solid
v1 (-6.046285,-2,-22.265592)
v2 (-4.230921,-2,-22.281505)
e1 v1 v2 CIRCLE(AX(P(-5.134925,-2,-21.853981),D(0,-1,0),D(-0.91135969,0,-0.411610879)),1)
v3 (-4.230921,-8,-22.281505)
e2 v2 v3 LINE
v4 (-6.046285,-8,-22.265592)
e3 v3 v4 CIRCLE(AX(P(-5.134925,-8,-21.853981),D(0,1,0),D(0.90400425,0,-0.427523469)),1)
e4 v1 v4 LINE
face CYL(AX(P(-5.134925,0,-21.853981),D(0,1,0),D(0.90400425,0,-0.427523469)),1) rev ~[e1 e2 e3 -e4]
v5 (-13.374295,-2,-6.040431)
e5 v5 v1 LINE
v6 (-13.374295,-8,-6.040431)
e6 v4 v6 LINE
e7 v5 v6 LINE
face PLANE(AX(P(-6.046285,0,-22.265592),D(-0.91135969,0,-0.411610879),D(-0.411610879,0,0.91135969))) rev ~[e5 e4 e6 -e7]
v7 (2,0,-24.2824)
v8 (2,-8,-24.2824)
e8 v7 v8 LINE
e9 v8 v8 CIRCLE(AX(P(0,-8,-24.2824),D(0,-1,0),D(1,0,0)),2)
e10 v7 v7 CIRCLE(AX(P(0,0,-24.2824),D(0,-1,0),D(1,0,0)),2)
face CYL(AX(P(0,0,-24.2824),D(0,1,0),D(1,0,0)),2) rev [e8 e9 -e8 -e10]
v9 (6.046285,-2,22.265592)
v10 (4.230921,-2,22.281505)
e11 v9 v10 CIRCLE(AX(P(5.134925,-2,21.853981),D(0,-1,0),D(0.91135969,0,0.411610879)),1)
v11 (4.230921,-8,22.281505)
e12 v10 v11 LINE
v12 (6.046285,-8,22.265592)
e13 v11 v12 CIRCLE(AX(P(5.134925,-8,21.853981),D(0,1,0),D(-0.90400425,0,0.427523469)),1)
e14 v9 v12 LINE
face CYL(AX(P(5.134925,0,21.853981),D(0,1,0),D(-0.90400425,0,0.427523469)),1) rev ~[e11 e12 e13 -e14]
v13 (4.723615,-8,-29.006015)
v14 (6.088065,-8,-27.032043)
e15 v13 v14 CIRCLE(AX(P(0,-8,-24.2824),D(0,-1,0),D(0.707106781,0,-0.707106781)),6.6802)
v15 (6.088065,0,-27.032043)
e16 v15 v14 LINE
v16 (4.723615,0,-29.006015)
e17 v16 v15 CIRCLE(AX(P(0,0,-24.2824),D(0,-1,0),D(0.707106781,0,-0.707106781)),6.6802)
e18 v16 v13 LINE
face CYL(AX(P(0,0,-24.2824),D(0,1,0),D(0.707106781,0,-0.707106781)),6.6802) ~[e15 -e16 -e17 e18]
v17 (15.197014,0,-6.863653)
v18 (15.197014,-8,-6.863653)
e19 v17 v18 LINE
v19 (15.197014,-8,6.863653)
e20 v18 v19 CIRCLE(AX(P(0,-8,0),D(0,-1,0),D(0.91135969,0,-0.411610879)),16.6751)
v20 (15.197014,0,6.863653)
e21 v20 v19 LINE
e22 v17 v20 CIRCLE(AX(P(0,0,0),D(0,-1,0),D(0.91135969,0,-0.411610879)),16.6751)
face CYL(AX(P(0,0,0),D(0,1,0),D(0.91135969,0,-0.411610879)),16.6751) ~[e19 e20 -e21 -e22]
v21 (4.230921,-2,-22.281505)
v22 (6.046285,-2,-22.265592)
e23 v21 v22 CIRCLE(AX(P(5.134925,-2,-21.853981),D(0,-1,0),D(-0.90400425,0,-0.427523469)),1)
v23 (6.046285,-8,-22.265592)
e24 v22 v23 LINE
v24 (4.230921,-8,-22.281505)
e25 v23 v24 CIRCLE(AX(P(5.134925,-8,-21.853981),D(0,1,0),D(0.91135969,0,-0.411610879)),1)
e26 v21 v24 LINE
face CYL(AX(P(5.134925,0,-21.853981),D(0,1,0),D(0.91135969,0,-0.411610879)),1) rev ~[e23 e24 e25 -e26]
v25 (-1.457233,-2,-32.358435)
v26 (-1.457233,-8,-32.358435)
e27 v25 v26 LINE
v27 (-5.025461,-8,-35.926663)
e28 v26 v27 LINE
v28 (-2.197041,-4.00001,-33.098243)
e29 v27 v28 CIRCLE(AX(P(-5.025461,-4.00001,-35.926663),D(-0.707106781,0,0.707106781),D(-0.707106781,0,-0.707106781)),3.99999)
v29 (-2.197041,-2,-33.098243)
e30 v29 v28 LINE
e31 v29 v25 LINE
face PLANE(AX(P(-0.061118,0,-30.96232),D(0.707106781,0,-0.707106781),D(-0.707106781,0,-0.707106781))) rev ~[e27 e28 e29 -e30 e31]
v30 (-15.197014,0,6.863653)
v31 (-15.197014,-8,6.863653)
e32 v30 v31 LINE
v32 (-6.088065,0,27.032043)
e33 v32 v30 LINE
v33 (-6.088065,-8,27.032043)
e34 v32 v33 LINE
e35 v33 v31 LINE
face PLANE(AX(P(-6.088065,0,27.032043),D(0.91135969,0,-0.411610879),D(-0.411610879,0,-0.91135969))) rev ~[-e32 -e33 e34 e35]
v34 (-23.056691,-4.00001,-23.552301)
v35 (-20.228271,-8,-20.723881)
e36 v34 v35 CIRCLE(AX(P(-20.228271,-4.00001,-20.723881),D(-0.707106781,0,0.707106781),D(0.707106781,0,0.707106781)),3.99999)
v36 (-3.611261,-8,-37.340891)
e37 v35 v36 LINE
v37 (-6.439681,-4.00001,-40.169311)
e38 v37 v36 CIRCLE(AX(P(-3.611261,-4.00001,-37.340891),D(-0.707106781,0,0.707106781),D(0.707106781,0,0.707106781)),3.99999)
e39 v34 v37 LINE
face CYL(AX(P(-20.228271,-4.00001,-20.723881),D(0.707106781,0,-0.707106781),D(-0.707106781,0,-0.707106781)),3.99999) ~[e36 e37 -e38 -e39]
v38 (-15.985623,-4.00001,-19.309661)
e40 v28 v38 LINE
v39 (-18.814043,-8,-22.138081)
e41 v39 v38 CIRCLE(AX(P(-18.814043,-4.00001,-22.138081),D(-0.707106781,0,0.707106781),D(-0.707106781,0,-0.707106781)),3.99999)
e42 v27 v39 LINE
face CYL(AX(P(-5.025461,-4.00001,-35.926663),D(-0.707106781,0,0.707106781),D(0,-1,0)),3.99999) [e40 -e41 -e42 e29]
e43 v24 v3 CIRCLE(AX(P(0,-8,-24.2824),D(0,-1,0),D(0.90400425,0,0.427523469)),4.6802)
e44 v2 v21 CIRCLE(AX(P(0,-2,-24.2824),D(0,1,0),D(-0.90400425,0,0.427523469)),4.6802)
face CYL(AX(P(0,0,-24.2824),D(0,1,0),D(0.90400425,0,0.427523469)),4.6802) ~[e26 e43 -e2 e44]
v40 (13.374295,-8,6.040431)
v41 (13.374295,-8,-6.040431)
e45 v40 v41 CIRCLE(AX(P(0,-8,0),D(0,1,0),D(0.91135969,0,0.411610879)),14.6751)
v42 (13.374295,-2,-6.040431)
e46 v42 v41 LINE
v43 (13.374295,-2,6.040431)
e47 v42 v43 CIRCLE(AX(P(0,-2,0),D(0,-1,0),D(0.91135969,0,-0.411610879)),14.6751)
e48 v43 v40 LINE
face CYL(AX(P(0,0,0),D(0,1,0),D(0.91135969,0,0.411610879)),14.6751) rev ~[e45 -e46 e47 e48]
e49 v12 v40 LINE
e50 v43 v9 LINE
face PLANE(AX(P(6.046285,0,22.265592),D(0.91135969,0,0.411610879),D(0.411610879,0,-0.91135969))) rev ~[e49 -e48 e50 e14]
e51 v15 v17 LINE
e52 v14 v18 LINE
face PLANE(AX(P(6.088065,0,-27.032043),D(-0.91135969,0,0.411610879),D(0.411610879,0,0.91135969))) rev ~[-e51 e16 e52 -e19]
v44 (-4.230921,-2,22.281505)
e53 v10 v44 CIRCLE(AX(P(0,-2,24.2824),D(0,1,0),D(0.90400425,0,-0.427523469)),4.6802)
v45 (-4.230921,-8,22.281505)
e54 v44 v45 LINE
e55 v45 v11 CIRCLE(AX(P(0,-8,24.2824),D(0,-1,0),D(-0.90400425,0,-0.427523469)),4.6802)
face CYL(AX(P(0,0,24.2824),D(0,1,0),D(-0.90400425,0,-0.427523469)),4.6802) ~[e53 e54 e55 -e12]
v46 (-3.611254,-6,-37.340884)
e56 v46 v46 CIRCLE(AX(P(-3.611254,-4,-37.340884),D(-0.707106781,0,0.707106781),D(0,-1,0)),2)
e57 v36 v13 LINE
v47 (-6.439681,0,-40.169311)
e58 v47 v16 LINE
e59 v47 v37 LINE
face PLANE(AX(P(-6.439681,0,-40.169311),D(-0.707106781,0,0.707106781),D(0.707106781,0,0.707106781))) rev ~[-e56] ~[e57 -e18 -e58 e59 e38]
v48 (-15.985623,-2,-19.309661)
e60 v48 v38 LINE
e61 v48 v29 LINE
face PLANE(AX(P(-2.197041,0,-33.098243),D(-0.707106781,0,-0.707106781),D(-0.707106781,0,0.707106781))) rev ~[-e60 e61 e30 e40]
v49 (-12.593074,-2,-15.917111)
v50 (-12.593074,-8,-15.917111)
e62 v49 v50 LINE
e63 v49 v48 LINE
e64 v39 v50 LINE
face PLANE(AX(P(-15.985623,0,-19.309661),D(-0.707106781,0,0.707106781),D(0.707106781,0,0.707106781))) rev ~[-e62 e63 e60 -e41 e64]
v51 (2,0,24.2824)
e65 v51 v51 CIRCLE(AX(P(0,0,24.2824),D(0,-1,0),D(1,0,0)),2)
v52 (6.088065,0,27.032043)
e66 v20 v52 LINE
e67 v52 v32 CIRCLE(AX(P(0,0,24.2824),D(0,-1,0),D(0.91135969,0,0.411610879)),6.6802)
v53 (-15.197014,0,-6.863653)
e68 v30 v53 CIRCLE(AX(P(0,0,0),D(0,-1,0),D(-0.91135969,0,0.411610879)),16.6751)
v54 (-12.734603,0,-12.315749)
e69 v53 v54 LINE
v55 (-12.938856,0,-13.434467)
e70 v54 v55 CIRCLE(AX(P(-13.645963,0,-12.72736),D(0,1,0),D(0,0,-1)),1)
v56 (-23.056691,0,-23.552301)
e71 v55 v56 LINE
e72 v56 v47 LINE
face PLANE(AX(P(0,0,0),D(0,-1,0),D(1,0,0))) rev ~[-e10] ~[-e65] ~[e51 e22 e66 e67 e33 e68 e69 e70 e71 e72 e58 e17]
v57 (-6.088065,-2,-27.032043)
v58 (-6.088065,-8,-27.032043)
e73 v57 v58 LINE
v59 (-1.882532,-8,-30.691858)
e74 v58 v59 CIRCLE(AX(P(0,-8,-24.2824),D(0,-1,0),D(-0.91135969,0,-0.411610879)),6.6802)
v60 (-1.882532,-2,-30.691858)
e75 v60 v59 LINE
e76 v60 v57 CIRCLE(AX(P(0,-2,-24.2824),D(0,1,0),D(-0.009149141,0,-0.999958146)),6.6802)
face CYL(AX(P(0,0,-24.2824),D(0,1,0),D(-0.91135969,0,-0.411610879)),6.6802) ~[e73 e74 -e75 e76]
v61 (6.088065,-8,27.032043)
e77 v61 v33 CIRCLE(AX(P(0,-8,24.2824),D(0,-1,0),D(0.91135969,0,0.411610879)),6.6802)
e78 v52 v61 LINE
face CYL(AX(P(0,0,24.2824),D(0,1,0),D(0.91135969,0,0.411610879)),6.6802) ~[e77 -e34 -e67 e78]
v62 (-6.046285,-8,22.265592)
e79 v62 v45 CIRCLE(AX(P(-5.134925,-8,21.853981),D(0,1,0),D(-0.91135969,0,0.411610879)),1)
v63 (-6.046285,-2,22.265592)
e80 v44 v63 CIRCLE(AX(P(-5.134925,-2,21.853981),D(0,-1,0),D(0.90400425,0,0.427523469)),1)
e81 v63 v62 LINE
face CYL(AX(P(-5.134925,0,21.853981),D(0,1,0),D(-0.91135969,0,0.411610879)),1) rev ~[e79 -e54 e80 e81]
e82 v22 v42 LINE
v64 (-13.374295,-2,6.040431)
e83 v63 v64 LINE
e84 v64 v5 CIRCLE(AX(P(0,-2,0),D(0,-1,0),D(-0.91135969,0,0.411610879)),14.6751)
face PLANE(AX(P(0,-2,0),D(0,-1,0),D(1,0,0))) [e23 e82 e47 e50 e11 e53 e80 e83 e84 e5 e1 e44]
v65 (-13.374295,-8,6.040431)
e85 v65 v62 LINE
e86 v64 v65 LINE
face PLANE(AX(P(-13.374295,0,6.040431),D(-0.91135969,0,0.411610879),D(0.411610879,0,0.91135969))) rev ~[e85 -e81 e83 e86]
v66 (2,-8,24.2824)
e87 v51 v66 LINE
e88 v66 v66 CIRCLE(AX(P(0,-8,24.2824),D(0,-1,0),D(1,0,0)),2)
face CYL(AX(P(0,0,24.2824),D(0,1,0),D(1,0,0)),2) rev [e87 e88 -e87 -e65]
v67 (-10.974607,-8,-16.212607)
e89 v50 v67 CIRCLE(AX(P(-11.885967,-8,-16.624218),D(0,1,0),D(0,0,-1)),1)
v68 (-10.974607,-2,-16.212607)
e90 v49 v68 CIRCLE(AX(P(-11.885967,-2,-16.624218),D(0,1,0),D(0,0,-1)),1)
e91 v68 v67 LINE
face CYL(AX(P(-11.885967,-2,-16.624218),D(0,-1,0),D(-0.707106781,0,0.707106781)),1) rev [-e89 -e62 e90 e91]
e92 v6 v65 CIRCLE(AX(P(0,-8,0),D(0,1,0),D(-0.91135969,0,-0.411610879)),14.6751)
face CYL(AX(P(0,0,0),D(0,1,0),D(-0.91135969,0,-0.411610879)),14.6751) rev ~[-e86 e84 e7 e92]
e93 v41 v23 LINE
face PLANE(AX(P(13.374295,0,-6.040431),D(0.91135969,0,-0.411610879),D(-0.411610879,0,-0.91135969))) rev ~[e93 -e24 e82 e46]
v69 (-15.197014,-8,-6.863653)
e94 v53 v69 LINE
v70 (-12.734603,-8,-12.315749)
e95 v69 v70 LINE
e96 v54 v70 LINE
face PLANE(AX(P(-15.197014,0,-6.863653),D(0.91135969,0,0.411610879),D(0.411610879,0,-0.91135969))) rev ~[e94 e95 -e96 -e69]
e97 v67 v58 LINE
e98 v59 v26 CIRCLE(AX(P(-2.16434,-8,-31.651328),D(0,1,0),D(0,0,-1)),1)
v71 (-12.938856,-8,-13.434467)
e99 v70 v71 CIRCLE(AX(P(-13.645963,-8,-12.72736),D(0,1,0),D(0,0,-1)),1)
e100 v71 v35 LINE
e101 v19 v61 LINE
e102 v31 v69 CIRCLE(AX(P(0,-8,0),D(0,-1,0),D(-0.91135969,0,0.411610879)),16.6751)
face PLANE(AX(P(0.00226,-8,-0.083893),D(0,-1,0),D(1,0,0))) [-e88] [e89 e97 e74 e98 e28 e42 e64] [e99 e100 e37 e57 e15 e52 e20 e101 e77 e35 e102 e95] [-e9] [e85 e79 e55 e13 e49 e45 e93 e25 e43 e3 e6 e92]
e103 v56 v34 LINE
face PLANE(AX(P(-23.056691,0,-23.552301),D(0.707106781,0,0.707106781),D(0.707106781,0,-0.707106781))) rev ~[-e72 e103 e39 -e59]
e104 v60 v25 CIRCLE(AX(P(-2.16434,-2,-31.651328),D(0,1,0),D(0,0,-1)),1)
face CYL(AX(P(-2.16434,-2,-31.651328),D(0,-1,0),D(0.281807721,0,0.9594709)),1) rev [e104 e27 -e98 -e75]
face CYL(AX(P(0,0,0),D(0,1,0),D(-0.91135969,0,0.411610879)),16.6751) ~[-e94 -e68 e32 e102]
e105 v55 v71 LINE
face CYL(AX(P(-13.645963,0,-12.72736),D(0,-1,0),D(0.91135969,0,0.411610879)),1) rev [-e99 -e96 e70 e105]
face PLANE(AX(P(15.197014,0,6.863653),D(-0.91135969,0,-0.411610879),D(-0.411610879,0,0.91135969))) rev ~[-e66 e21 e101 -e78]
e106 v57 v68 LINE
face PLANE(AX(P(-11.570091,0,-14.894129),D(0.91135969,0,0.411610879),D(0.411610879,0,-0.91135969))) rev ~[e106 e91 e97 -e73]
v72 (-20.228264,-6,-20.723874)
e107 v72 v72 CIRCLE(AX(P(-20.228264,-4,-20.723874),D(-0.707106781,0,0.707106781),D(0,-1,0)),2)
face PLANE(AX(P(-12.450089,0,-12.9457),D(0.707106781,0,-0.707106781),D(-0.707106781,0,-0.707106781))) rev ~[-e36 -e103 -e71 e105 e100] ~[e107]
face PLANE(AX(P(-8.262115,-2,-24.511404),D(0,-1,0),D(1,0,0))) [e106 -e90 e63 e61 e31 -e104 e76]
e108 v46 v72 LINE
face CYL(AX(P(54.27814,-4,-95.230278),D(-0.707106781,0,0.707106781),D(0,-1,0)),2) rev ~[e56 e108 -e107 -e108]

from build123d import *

# Parameters (mm, degrees)
F0_R     = 2
F1_DEPTH = 8
F2_DEPTH = 2
F3_R     = 1
F5_D     = 4
F6_R     = 3.99999


# Not quite as in the source:
# - a fillet or chamfer is up to 0.001 mm smaller than in the source, because OpenCascade refuses the exact size


with BuildPart() as f1:
    # F0 (on Front) → F1 (new body)
    with BuildSketch(Plane.XZ):
        with BuildLine():
            Line((15.1970139668, 6.8636525628), (6.0880650012, 27.0320429916))
            ThreePointArc((6.0880650012, 27.0320429916), (0, 30.9626), (-6.0880650012, 27.0320429916))
            Line((-6.0880650012, 27.0320429916), (-15.1970139668, 6.8636525628))
            ThreePointArc((-15.1970139668, 6.8636525628), (-16.6751, 0), (-15.1970139668, -6.8636525628))
            Line((-15.1970139668, -6.8636525628), (-12.4500889322, -12.9456996558))
            Line((-12.4500889322, -12.9456996558), (-11.570090993, -14.8941288413))
            Line((-11.570090993, -14.8941288413), (-6.0880650012, -27.0320429916))
            ThreePointArc((-6.0880650012, -27.0320429916), (-3.6489564687, -29.8779507977), (-0.0611180905, -30.9623204051))
            ThreePointArc((-0.0611180905, -30.9623204051), (2.5281419438, -30.4657300374), (4.7236147197, -29.0060147197))
            ThreePointArc((4.7236147197, -29.0060147197), (5.4952020611, -28.0807978659), (6.0880650012, -27.0320429916))
            Line((6.0880650012, -27.0320429916), (15.1970139668, -6.8636525628))
            ThreePointArc((15.1970139668, -6.8636525628), (16.6751, 0), (15.1970139668, 6.8636525628))
        make_face()
        with Locations((0, -24.2824)):
            Circle(F0_R, mode=Mode.SUBTRACT)
        with BuildLine():
            Line((-13.3742945868, 6.0404308054), (-6.0462846285, 22.2655920687))
            ThreePointArc((-6.0462846285, 22.2655920687), (-5.1436901116, 22.8539427752), (-4.2309206889, 22.2815046593))
            ThreePointArc((-4.2309206889, 22.2815046593), (0, 19.6022), (4.2309206889, 22.2815046593))
            ThreePointArc((4.2309206889, 22.2815046593), (5.1436901116, 22.8539427752), (6.0462846285, 22.2655920687))
            Line((6.0462846285, 22.2655920687), (13.3742945868, 6.0404308054))
            ThreePointArc((13.3742945868, 6.0404308054), (14.6751, 0), (13.3742945868, -6.0404308054))
            Line((13.3742945868, -6.0404308054), (6.0462846285, -22.2655920687))
            ThreePointArc((6.0462846285, -22.2655920687), (5.1436901116, -22.8539427752), (4.2309206889, -22.2815046593))
            ThreePointArc((4.2309206889, -22.2815046593), (0, -19.6022), (-4.2309206889, -22.2815046593))
            ThreePointArc((-4.2309206889, -22.2815046593), (-5.1436901116, -22.8539427752), (-6.0462846285, -22.2655920687))
            Line((-6.0462846285, -22.2655920687), (-13.3742945868, -6.0404308054))
            ThreePointArc((-13.3742945868, -6.0404308054), (-14.6751, 0), (-13.3742945868, 6.0404308054))
        make_face(mode=Mode.SUBTRACT)
        with Locations((0, 24.2824)):
            Circle(F0_R, mode=Mode.SUBTRACT)
        with BuildLine():
            Line((-11.570090993, -14.8941288413), (-12.4500889322, -12.9456996558))
            Line((-12.4500889322, -12.9456996558), (-23.05669065, -23.5523013736))
            Line((-23.05669065, -23.5523013736), (-6.4396812921, -40.1693107315))
            Line((-6.4396812921, -40.1693107315), (4.7236147197, -29.0060147197))
            ThreePointArc((4.7236147197, -29.0060147197), (2.5281419438, -30.4657300374), (-0.0611180905, -30.9623204051))
            Line((-0.0611180905, -30.9623204051), (-2.197040605, -33.0982429196))
            Line((-2.197040605, -33.0982429196), (-15.9856228381, -19.3096606865))
            Line((-15.9856228381, -19.3096606865), (-11.570090993, -14.8941288413))
        make_face()
    extrude(amount=F1_DEPTH)

    # F0 (on Front) → F2 (join)
    with BuildSketch(Plane.XZ):
        with BuildLine():
            ThreePointArc((-4.2309206889, 22.2815046593), (-5.1436901116, 22.8539427752), (-6.0462846285, 22.2655920687))
            Line((-6.0462846285, 22.2655920687), (-13.3742945868, 6.0404308054))
            ThreePointArc((-13.3742945868, 6.0404308054), (-14.6751, 0), (-13.3742945868, -6.0404308054))
            Line((-13.3742945868, -6.0404308054), (-6.0462846285, -22.2655920687))
            ThreePointArc((-6.0462846285, -22.2655920687), (-5.1436901116, -22.8539427752), (-4.2309206889, -22.2815046593))
            ThreePointArc((-4.2309206889, -22.2815046593), (0, -19.6022), (4.2309206889, -22.2815046593))
            ThreePointArc((4.2309206889, -22.2815046593), (5.1436901116, -22.8539427752), (6.0462846285, -22.2655920687))
            Line((6.0462846285, -22.2655920687), (13.3742945868, -6.0404308054))
            ThreePointArc((13.3742945868, -6.0404308054), (14.6751, 0), (13.3742945868, 6.0404308054))
            Line((13.3742945868, 6.0404308054), (6.0462846285, 22.2655920687))
            ThreePointArc((6.0462846285, 22.2655920687), (5.1436901116, 22.8539427752), (4.2309206889, 22.2815046593))
            ThreePointArc((4.2309206889, 22.2815046593), (0, 19.6022), (-4.2309206889, 22.2815046593))
        make_face()
        with BuildLine():
            Line((-6.0880650012, -27.0320429916), (-11.570090993, -14.8941288413))
            Line((-11.570090993, -14.8941288413), (-15.9856228381, -19.3096606865))
            Line((-15.9856228381, -19.3096606865), (-2.197040605, -33.0982429196))
            Line((-2.197040605, -33.0982429196), (-0.0611180905, -30.9623204051))
            ThreePointArc((-0.0611180905, -30.9623204051), (-3.6489564687, -29.8779507977), (-6.0880650012, -27.0320429916))
        make_face()
    extrude(amount=F2_DEPTH)

    # F3
    f3_edges = [f1.edges().sort_by_distance(p)[0] for p in [
        (-12.450089, -4, -12.9457),
        (-11.570091, -5, -14.894129),
        (-0.061118, -5, -30.96232),
    ]]
    fillet(f3_edges, radius=F3_R)

    # F5 (through all)
    with Locations(Plane(origin=(16.8648147197, 0, -16.8648147197), x_dir=(0, 1, 0), z_dir=(0.7071067812, 0, -0.7071067812))):
        with Locations((-4, -28.9575343242)):
            Hole(F5_D / 2)

    # F6 (radius 4 in the source; OpenCascade refuses exactly that, so slightly less here)
    f6_edges = [f1.edges().sort_by_distance(p)[0] for p in [
        (-14.748186, -8, -31.860806),
        (-9.091332, -8, -26.203952),
    ]]
    fillet(f6_edges, radius=F6_R)


solid = f1.part
